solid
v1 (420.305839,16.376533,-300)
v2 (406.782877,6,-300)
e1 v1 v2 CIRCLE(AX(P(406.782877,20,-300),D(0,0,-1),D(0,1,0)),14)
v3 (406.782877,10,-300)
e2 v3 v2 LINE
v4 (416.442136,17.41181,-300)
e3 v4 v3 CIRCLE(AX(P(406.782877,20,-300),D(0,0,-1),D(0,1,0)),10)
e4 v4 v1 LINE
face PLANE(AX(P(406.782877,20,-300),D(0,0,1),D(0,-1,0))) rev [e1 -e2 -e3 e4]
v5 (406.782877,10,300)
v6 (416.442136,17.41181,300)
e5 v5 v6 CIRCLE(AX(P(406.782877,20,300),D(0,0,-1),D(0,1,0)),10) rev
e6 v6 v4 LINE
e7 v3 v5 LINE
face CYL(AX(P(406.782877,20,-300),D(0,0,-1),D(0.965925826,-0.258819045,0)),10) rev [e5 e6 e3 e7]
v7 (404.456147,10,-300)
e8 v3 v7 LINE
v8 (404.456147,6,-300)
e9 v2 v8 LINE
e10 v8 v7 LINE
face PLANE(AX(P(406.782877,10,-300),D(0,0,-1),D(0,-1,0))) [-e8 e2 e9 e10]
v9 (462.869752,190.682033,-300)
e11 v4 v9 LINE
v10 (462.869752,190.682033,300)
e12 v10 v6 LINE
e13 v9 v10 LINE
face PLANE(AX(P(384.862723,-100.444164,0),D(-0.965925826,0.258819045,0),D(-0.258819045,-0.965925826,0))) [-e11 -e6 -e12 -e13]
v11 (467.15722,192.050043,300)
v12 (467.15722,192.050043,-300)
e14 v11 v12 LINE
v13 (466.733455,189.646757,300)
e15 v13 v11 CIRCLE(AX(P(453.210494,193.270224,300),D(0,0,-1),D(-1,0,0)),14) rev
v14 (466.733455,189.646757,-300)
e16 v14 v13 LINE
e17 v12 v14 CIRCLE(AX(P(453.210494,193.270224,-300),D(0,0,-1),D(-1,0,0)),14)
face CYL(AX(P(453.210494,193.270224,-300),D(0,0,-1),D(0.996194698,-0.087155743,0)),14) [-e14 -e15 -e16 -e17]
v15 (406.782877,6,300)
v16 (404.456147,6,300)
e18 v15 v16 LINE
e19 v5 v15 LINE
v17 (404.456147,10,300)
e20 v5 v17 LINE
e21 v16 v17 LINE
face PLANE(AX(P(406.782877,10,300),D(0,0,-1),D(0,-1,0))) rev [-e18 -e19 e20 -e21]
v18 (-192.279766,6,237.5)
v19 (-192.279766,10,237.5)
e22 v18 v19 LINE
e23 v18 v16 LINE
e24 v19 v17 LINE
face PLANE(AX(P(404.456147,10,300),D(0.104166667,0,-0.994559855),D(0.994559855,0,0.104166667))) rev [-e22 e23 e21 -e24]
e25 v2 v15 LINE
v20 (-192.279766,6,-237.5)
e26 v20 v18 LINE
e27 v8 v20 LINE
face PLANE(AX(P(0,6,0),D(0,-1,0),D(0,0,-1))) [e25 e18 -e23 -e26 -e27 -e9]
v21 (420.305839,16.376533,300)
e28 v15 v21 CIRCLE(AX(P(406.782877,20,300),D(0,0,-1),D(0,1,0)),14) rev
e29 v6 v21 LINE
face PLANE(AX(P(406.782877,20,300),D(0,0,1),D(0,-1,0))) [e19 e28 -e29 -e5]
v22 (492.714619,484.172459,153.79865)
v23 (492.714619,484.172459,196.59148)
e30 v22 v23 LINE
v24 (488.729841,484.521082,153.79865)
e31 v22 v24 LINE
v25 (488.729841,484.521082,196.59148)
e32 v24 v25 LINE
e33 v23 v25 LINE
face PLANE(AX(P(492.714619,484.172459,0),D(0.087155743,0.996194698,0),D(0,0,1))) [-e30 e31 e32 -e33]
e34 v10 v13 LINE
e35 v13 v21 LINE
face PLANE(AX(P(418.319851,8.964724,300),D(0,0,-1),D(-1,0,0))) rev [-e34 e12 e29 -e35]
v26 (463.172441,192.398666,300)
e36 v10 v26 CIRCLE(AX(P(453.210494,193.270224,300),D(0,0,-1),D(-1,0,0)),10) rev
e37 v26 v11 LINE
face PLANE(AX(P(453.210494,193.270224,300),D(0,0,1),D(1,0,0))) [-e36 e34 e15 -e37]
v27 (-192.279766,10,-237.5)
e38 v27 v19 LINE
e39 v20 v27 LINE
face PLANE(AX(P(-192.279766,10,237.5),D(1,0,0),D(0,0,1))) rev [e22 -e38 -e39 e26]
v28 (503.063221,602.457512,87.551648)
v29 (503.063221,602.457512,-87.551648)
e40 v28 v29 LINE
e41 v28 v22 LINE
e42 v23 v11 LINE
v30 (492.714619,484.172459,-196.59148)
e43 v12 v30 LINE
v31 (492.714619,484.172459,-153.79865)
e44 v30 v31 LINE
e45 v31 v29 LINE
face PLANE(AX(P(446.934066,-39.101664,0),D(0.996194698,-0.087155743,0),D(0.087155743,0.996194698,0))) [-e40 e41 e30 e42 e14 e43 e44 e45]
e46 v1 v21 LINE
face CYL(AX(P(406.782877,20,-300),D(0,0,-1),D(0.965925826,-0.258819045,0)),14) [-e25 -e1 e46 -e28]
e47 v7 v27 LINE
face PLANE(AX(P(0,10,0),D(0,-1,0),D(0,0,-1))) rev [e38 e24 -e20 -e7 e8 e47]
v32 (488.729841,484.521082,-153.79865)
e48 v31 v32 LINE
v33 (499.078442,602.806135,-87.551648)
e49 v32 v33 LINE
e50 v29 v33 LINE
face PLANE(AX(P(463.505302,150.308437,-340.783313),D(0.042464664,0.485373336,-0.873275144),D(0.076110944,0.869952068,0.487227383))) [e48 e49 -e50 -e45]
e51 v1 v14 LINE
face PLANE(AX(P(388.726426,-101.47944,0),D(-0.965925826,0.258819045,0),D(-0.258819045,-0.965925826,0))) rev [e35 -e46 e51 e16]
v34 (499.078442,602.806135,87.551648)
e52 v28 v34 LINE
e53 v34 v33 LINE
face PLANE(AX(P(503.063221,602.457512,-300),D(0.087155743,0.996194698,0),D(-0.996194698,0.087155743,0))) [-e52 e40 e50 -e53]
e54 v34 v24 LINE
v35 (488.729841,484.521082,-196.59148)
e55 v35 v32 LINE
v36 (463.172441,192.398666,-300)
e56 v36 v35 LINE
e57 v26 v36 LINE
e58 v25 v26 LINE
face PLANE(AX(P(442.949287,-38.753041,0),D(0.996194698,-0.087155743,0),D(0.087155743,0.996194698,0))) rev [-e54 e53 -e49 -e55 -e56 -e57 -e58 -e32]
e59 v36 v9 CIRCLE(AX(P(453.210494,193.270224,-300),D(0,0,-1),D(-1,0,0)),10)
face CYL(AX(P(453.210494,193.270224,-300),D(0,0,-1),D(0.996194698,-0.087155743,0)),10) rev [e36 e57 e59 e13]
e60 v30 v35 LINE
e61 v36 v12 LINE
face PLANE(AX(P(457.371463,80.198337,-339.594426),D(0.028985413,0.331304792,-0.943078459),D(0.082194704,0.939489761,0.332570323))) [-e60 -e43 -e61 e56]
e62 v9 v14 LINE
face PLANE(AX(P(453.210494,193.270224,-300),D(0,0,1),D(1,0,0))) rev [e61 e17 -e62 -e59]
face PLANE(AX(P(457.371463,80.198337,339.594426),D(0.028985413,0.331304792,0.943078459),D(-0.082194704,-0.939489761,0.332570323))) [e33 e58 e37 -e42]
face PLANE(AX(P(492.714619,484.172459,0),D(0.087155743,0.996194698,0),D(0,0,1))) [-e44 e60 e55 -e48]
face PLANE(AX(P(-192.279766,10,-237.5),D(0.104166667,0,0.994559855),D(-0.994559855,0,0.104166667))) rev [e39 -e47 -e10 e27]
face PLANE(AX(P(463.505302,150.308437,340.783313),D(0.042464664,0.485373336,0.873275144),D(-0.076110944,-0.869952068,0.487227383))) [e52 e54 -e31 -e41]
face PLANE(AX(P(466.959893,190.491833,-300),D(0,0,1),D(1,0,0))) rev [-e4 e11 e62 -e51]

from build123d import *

# Parameters (mm, degrees)
BOSS_EXTRUDE1_DEPTH          = 10
CONVERT_SOLID1_DEPTH         = 6
EDGE_FLANGE2_DEPTH           = 600
EDGE_FLANGE4_STRIP_CUT_DEPTH = 600
EDGE_FLANGE4_DEPTH           = 600
CUT_EXTRUDE2_DEPTH           = 952.374861111
CUT_EXTRUDE2_DEPTH_BACK      = 952.374861111


# Read off the part's stored shape, not the designer's step: Convert-Solid1
# Sheet-metal steps are written as plain solids
with BuildPart() as part:
    # Sketch1 → Boss-Extrude1 (new body)
    with BuildSketch(Plane(origin=(0, 0, 0), x_dir=(1, 0, 0), z_dir=(0, 1, 0))):
        Polygon((-192.279765905, 0), (-192.279765905, 237.5), (404.456147209, 300), (404.456147209, 0), (404.456147209, -300), (-192.279765905, -237.5), align=None)
    extrude(amount=BOSS_EXTRUDE1_DEPTH)

    # Convert-Solid1 outline → Convert-Solid1 (cut)
    with BuildSketch(Plane(origin=(0, 0, 0), x_dir=(1, 0, 0), z_dir=(0, 1, 0))):
        Polygon((-192.279765905, -237.5), (404.456147209, -300), (404.456147209, 300), (-192.279765905, 237.5), align=None)
    extrude(amount=CONVERT_SOLID1_DEPTH, mode=Mode.SUBTRACT)

    # Edge-Flange2 section (across the edge) → Edge-Flange2 (add)
    with BuildSketch(Plane(origin=(414.456147209, 10, 300), x_dir=(-0.9659258262890673, 0.25881904510252446, 0), z_dir=(0, 0, -1))):
        with BuildLine():
            Line((-4, 7.67326988), (-4, 187.930692048))
            Line((-4, 187.930692048), (0, 187.930692048))
            Line((0, 187.930692048), (0, 7.67326988))
            ThreePointArc((0, 7.67326988), (2.066466597, 1.58565559), (7.411809549, -1.985988383))
            Line((7.411809549, -1.985988383), (9.659258263, -2.588190451))
            Line((9.659258263, -2.588190451), (8.623982082, -6.451893756))
            Line((8.623982082, -6.451893756), (6.376533369, -5.849691688))
            ThreePointArc((6.376533369, -5.849691688), (-1.106946764, -0.849390126), (-4, 7.67326988))
        make_face()
    extrude(amount=EDGE_FLANGE2_DEPTH)

    # Edge-Flange4 strip (across the edge) → Edge-Flange4 strip cut (cut)
    with BuildSketch(Plane(origin=(463.09618947, 191.527109002, 300), x_dir=(-0.9961946980917449, 0.0871557427476667, 0), z_dir=(0, 0, -1))):
        Polygon((-10.038642938, 33.896891256), (-3.787308542, -1.556187852), (0.15192247, -0.861595141), (-6.099411926, 34.591483967), align=None)
    extrude(amount=EDGE_FLANGE4_STRIP_CUT_DEPTH, mode=Mode.SUBTRACT)

    # Edge-Flange4 section (across the edge) → Edge-Flange4 (add)
    with BuildSketch(Plane(origin=(463.09618947, 191.527109002, 300), x_dir=(-0.9961946980917449, 0.0871557427476667, 0), z_dir=(0, 0, -1))):
        with BuildLine():
            Line((-4, 0.874886635), (-4, 412.850045346))
            Line((-4, 412.850045346), (0, 412.850045346))
            Line((0, 412.850045346), (0, 0.874886635))
            ThreePointArc((0, 0.874886635), (0.038053019, 0.003329208), (0.15192247, -0.861595141))
            Line((0.15192247, -0.861595141), (-3.787308542, -1.556187852))
            ThreePointArc((-3.787308542, -1.556187852), (-3.946725773, -0.345293763), (-4, 0.874886635))
        make_face()
    extrude(amount=EDGE_FLANGE4_DEPTH)

    # Sketch22 → Cut-Extrude2 (cut, two sides: drawn at the far end of the back side and taken through both)
    with BuildSketch(Plane(origin=(442.9492869, -38.753041121, 0), x_dir=(0, 0, 1), z_dir=(-0.9961946980917449, 0.08715574274766662, 0)).offset(-CUT_EXTRUDE2_DEPTH_BACK)):
        Polygon((300, 232.03466952), (196.591479546, 525.272945681), (153.798650158, 525.272945681), (87.551647761, 644.009828231), (302.699803465, 645.121208779), (304.833664863, 232.03466952), align=None)
        Polygon((-300, 232.03466952), (-196.591479546, 525.272945681), (-153.798650158, 525.272945681), (-87.551647761, 644.009828231), (-302.699803465, 645.121208779), (-304.833664863, 232.03466952), align=None)
    extrude(amount=CUT_EXTRUDE2_DEPTH + CUT_EXTRUDE2_DEPTH_BACK, mode=Mode.SUBTRACT)


solid = part.part
